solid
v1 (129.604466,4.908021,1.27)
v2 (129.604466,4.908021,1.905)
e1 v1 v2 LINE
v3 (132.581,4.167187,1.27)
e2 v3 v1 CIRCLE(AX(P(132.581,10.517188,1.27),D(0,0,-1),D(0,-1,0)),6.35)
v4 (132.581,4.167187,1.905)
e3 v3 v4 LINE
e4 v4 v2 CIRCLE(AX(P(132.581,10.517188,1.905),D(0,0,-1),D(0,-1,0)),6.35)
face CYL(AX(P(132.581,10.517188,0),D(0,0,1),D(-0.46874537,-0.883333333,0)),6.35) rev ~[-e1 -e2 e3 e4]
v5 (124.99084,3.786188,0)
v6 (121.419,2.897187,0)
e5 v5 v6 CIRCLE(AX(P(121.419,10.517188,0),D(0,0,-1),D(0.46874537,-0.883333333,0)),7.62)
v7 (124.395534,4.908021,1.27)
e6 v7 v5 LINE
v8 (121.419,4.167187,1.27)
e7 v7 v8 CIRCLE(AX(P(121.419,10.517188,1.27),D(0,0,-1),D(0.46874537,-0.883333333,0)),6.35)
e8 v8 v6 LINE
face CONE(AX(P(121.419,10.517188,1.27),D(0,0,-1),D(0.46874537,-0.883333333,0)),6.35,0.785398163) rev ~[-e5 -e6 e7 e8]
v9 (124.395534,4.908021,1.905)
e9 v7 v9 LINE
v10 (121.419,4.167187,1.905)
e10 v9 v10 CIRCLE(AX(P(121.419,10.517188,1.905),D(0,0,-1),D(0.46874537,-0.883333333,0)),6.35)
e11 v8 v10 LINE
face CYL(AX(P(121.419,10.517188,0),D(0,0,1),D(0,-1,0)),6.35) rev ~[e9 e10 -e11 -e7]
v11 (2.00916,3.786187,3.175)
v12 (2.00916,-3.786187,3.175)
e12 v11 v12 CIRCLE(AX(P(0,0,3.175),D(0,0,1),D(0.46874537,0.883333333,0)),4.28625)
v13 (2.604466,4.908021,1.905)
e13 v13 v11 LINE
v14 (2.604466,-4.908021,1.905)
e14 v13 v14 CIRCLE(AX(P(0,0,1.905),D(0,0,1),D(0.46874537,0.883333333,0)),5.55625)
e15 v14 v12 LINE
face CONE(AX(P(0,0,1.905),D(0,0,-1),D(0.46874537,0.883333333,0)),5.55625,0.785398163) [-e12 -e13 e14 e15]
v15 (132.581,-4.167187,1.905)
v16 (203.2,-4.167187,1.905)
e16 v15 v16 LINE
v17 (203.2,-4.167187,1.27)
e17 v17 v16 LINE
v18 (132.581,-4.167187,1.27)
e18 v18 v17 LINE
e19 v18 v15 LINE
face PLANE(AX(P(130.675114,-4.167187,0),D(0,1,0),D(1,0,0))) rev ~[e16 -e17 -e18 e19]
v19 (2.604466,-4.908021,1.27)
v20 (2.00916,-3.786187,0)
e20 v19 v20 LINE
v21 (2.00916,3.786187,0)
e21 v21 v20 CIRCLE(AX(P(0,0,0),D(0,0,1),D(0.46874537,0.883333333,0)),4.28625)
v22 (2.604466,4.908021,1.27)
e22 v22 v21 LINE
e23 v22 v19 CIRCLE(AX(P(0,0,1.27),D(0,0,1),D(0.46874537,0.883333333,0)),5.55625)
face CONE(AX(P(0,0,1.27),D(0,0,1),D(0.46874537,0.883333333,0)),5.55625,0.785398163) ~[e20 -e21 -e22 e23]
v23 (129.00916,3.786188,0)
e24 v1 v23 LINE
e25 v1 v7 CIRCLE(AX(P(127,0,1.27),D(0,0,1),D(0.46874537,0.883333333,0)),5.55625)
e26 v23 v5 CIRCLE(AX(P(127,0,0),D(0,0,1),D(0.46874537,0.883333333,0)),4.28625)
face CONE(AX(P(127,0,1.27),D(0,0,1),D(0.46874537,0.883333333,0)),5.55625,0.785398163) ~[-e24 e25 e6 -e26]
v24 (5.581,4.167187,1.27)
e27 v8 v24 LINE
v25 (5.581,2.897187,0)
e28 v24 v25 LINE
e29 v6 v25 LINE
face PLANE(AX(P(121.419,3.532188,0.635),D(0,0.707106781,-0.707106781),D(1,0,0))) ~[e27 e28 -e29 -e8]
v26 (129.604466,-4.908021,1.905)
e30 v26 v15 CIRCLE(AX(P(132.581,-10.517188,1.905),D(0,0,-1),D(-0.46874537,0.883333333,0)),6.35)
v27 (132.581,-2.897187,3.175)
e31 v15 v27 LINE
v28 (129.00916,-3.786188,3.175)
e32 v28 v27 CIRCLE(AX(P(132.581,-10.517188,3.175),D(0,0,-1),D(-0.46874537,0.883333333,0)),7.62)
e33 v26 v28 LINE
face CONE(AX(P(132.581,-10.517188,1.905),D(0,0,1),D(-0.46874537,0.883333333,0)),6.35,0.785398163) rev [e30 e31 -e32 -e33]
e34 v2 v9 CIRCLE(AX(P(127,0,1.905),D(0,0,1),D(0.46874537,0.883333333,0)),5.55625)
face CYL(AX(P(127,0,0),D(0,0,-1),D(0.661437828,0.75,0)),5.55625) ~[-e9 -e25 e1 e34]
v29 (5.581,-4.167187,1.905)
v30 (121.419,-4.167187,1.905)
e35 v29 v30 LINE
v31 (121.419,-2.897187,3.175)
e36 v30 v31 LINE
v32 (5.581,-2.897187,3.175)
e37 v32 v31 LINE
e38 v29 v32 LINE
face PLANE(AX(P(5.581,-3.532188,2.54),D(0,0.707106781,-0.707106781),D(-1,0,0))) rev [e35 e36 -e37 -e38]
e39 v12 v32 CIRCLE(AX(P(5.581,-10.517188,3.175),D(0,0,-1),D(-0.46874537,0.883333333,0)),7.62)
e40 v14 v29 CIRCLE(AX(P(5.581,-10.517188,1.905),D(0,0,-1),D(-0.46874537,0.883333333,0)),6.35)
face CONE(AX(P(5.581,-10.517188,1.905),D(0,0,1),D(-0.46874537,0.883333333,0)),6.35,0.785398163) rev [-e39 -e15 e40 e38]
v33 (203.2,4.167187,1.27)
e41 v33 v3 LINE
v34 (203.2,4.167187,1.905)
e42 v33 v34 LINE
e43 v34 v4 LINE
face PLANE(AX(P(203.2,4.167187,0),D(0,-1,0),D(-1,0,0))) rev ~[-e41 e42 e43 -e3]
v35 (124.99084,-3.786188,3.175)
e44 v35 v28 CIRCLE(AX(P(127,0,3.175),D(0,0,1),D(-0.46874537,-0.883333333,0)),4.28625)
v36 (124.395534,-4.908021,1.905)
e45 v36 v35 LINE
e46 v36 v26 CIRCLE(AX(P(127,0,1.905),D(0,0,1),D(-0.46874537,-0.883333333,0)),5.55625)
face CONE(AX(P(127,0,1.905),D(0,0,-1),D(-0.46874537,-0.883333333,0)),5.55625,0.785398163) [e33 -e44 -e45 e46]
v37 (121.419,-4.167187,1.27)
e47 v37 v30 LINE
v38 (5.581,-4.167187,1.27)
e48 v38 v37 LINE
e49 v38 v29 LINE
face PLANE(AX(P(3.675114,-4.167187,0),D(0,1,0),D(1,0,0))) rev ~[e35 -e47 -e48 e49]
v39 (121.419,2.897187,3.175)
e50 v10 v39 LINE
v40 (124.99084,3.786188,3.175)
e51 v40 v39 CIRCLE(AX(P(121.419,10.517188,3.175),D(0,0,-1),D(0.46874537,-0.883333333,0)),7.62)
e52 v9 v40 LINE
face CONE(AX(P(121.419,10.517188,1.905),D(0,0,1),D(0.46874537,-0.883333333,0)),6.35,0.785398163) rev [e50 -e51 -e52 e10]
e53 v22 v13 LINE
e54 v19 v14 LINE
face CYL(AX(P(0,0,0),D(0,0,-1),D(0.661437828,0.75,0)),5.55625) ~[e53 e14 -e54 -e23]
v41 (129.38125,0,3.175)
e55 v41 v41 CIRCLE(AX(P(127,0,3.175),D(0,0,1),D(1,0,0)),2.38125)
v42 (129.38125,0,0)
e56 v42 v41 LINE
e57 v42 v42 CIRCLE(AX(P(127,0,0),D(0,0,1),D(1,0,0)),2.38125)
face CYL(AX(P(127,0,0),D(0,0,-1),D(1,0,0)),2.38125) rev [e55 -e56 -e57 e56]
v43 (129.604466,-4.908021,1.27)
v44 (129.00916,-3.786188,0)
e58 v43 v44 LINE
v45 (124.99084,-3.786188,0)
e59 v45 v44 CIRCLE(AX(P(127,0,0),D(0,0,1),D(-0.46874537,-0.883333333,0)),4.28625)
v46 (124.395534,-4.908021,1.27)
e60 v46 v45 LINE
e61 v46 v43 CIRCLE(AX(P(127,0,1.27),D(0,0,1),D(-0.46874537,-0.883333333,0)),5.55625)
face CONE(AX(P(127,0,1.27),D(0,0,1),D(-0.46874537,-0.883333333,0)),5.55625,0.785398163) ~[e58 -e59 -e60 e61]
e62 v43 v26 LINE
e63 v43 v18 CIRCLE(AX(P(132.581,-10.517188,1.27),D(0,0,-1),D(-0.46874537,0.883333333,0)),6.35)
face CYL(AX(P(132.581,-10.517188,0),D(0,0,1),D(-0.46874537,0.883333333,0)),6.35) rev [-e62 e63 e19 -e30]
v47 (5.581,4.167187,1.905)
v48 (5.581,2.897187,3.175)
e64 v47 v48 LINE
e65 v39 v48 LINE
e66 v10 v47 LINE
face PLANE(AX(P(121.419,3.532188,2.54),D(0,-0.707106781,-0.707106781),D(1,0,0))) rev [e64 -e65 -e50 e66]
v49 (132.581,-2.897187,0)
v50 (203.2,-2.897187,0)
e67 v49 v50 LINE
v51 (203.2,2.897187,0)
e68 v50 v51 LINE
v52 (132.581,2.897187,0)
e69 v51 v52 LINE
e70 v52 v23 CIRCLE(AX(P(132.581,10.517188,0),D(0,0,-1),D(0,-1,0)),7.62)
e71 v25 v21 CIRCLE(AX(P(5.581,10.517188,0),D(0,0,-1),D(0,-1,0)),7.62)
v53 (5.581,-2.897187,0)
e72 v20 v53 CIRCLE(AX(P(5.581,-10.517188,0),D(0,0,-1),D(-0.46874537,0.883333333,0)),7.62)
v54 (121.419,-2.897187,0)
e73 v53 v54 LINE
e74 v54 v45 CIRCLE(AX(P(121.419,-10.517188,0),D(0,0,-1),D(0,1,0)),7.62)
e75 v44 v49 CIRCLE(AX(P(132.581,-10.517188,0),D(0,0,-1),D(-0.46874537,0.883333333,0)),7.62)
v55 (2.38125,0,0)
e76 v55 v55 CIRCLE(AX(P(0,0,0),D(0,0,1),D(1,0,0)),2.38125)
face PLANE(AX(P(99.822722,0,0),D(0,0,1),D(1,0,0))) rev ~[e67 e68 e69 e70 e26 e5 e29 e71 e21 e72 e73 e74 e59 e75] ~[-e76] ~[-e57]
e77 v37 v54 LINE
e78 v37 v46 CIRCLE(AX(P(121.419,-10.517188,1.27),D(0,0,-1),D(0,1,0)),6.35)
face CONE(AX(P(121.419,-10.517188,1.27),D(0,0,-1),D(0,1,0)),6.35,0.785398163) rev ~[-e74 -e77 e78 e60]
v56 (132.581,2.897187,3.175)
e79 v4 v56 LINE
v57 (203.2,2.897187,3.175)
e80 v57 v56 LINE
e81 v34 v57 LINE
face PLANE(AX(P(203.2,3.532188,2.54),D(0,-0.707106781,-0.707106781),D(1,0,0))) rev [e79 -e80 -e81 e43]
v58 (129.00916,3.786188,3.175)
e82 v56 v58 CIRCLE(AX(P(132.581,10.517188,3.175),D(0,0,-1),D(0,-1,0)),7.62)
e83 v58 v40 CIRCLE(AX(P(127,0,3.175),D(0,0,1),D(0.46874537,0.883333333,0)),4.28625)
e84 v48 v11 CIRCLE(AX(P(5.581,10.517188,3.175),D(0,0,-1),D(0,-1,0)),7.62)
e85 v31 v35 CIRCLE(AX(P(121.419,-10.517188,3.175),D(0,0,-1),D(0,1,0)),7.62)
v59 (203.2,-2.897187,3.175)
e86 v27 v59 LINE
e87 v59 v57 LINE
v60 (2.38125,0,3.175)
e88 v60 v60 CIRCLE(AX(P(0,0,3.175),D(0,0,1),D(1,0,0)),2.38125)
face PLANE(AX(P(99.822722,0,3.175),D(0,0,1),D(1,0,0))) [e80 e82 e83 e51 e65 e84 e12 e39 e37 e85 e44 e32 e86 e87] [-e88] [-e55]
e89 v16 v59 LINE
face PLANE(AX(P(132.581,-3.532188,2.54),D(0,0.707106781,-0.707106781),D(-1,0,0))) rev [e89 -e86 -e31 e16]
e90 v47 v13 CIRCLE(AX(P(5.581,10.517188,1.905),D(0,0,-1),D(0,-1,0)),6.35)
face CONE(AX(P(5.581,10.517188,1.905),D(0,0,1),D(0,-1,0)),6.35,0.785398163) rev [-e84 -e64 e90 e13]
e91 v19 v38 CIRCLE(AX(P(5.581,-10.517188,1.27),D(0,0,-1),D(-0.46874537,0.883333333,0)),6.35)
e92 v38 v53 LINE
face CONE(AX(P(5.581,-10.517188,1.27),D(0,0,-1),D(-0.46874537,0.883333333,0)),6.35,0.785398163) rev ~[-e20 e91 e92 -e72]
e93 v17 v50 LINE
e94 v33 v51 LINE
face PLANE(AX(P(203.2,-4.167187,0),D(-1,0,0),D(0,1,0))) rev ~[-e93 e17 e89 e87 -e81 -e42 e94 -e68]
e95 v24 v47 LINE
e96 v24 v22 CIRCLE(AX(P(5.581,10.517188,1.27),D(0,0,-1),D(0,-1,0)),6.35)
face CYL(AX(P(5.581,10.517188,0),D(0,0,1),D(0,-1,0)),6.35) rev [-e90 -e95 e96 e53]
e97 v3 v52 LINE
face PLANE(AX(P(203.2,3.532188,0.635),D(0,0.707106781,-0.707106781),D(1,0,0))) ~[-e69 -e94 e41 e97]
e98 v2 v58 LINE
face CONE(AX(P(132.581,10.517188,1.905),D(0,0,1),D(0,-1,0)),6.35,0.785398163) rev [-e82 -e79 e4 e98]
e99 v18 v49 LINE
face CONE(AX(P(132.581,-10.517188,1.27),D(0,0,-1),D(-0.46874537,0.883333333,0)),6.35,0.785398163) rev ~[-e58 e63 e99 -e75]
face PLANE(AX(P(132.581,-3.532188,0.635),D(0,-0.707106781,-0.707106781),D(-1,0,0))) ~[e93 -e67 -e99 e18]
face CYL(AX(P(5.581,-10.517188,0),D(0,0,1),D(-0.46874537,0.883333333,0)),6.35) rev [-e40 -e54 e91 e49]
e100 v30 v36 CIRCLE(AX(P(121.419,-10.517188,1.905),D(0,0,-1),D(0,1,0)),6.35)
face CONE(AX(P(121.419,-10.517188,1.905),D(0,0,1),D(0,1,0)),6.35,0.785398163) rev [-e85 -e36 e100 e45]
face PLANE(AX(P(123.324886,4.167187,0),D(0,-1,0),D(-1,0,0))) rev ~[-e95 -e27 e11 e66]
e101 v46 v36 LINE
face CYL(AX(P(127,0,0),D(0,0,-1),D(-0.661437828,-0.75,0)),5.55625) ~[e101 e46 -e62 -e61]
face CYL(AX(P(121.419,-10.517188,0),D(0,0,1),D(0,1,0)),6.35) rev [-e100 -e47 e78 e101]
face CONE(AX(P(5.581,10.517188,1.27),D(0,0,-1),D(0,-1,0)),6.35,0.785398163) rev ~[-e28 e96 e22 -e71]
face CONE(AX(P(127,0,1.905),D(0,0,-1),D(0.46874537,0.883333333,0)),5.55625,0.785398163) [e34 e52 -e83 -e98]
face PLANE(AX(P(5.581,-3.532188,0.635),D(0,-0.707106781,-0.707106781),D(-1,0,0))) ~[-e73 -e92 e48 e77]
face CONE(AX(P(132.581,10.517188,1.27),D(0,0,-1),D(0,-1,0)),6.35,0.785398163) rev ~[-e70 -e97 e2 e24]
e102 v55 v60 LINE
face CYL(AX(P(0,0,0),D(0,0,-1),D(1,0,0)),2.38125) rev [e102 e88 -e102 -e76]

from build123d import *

# Parameters (mm, degrees)
F0_R     = 2.38125
F1_DEPTH = 3.175
F2_R     = 6.35
F3_SIZE  = 1.27


with BuildPart() as f1:
    # F0 (on Top) → F1 (new body)
    with BuildSketch(Plane.XY):
        with BuildLine():
            Line((123.3248860695, 4.1671875), (3.6751139305, 4.1671875))
            ThreePointArc((3.6751139305, 4.1671875), (-5.55625, 0), (3.6751139305, -4.1671875))
            Line((3.6751139305, -4.1671875), (123.3248860695, -4.1671875))
            ThreePointArc((123.3248860695, -4.1671875), (127, -5.55625), (130.6751139305, -4.1671875))
            Line((130.6751139305, -4.1671875), (203.2, -4.1671875))
            Line((203.2, -4.1671875), (203.2, 4.1671875))
            Line((203.2, 4.1671875), (130.6751139305, 4.1671875))
            ThreePointArc((130.6751139305, 4.1671875), (127, 5.55625), (123.3248860695, 4.1671875))
        make_face()
        Circle(F0_R, mode=Mode.SUBTRACT)
        with Locations((127, 0)):
            Circle(F0_R, mode=Mode.SUBTRACT)
    extrude(amount=F1_DEPTH)

    # F2
    f2_edges = [f1.edges().sort_by_distance(p)[0] for p in [
        (3.675114, 4.167187, 1.5875),
        (3.675114, -4.167188, 1.5875),
        (123.324886, -4.167187, 1.5875),
        (130.675114, 4.167187, 1.5875),
        (123.324886, 4.167187, 1.5875),
        (130.675114, -4.167187, 1.5875),
    ]]
    fillet(f2_edges, radius=F2_R)

    # F3
    f3_edges = [f1.edges().sort_by_distance(p)[0] for p in [
        (63.5, 4.167187, 3.175),
        (63.5, 4.167187, 0),
        (127, 5.55625, 0),
        (127, 5.55625, 3.175),
        (131.047329, 4.355179, 0),
        (122.952671, 4.355179, 0),
        (167.8905, 4.167187, 0),
        (4.047329, 4.355179, 0),
        (167.8905, -4.167187, 0),
        (-5.55625, 0, 0),
        (131.047329, -4.355179, 0),
        (4.047329, -4.355179, 0),
        (127, -5.55625, 0),
        (63.5, -4.167187, 0),
        (122.952671, -4.355179, 0),
        (131.047329, 4.355179, 3.175),
        (122.952671, 4.355179, 3.175),
        (167.8905, 4.167187, 3.175),
        (4.047329, 4.355179, 3.175),
        (167.8905, -4.167187, 3.175),
        (-5.55625, 0, 3.175),
        (131.047329, -4.355179, 3.175),
        (4.047329, -4.355179, 3.175),
        (127, -5.55625, 3.175),
        (63.5, -4.167187, 3.175),
        (122.952671, -4.355179, 3.175),
    ]]
    chamfer(f3_edges, length=F3_SIZE)


solid = f1.part
